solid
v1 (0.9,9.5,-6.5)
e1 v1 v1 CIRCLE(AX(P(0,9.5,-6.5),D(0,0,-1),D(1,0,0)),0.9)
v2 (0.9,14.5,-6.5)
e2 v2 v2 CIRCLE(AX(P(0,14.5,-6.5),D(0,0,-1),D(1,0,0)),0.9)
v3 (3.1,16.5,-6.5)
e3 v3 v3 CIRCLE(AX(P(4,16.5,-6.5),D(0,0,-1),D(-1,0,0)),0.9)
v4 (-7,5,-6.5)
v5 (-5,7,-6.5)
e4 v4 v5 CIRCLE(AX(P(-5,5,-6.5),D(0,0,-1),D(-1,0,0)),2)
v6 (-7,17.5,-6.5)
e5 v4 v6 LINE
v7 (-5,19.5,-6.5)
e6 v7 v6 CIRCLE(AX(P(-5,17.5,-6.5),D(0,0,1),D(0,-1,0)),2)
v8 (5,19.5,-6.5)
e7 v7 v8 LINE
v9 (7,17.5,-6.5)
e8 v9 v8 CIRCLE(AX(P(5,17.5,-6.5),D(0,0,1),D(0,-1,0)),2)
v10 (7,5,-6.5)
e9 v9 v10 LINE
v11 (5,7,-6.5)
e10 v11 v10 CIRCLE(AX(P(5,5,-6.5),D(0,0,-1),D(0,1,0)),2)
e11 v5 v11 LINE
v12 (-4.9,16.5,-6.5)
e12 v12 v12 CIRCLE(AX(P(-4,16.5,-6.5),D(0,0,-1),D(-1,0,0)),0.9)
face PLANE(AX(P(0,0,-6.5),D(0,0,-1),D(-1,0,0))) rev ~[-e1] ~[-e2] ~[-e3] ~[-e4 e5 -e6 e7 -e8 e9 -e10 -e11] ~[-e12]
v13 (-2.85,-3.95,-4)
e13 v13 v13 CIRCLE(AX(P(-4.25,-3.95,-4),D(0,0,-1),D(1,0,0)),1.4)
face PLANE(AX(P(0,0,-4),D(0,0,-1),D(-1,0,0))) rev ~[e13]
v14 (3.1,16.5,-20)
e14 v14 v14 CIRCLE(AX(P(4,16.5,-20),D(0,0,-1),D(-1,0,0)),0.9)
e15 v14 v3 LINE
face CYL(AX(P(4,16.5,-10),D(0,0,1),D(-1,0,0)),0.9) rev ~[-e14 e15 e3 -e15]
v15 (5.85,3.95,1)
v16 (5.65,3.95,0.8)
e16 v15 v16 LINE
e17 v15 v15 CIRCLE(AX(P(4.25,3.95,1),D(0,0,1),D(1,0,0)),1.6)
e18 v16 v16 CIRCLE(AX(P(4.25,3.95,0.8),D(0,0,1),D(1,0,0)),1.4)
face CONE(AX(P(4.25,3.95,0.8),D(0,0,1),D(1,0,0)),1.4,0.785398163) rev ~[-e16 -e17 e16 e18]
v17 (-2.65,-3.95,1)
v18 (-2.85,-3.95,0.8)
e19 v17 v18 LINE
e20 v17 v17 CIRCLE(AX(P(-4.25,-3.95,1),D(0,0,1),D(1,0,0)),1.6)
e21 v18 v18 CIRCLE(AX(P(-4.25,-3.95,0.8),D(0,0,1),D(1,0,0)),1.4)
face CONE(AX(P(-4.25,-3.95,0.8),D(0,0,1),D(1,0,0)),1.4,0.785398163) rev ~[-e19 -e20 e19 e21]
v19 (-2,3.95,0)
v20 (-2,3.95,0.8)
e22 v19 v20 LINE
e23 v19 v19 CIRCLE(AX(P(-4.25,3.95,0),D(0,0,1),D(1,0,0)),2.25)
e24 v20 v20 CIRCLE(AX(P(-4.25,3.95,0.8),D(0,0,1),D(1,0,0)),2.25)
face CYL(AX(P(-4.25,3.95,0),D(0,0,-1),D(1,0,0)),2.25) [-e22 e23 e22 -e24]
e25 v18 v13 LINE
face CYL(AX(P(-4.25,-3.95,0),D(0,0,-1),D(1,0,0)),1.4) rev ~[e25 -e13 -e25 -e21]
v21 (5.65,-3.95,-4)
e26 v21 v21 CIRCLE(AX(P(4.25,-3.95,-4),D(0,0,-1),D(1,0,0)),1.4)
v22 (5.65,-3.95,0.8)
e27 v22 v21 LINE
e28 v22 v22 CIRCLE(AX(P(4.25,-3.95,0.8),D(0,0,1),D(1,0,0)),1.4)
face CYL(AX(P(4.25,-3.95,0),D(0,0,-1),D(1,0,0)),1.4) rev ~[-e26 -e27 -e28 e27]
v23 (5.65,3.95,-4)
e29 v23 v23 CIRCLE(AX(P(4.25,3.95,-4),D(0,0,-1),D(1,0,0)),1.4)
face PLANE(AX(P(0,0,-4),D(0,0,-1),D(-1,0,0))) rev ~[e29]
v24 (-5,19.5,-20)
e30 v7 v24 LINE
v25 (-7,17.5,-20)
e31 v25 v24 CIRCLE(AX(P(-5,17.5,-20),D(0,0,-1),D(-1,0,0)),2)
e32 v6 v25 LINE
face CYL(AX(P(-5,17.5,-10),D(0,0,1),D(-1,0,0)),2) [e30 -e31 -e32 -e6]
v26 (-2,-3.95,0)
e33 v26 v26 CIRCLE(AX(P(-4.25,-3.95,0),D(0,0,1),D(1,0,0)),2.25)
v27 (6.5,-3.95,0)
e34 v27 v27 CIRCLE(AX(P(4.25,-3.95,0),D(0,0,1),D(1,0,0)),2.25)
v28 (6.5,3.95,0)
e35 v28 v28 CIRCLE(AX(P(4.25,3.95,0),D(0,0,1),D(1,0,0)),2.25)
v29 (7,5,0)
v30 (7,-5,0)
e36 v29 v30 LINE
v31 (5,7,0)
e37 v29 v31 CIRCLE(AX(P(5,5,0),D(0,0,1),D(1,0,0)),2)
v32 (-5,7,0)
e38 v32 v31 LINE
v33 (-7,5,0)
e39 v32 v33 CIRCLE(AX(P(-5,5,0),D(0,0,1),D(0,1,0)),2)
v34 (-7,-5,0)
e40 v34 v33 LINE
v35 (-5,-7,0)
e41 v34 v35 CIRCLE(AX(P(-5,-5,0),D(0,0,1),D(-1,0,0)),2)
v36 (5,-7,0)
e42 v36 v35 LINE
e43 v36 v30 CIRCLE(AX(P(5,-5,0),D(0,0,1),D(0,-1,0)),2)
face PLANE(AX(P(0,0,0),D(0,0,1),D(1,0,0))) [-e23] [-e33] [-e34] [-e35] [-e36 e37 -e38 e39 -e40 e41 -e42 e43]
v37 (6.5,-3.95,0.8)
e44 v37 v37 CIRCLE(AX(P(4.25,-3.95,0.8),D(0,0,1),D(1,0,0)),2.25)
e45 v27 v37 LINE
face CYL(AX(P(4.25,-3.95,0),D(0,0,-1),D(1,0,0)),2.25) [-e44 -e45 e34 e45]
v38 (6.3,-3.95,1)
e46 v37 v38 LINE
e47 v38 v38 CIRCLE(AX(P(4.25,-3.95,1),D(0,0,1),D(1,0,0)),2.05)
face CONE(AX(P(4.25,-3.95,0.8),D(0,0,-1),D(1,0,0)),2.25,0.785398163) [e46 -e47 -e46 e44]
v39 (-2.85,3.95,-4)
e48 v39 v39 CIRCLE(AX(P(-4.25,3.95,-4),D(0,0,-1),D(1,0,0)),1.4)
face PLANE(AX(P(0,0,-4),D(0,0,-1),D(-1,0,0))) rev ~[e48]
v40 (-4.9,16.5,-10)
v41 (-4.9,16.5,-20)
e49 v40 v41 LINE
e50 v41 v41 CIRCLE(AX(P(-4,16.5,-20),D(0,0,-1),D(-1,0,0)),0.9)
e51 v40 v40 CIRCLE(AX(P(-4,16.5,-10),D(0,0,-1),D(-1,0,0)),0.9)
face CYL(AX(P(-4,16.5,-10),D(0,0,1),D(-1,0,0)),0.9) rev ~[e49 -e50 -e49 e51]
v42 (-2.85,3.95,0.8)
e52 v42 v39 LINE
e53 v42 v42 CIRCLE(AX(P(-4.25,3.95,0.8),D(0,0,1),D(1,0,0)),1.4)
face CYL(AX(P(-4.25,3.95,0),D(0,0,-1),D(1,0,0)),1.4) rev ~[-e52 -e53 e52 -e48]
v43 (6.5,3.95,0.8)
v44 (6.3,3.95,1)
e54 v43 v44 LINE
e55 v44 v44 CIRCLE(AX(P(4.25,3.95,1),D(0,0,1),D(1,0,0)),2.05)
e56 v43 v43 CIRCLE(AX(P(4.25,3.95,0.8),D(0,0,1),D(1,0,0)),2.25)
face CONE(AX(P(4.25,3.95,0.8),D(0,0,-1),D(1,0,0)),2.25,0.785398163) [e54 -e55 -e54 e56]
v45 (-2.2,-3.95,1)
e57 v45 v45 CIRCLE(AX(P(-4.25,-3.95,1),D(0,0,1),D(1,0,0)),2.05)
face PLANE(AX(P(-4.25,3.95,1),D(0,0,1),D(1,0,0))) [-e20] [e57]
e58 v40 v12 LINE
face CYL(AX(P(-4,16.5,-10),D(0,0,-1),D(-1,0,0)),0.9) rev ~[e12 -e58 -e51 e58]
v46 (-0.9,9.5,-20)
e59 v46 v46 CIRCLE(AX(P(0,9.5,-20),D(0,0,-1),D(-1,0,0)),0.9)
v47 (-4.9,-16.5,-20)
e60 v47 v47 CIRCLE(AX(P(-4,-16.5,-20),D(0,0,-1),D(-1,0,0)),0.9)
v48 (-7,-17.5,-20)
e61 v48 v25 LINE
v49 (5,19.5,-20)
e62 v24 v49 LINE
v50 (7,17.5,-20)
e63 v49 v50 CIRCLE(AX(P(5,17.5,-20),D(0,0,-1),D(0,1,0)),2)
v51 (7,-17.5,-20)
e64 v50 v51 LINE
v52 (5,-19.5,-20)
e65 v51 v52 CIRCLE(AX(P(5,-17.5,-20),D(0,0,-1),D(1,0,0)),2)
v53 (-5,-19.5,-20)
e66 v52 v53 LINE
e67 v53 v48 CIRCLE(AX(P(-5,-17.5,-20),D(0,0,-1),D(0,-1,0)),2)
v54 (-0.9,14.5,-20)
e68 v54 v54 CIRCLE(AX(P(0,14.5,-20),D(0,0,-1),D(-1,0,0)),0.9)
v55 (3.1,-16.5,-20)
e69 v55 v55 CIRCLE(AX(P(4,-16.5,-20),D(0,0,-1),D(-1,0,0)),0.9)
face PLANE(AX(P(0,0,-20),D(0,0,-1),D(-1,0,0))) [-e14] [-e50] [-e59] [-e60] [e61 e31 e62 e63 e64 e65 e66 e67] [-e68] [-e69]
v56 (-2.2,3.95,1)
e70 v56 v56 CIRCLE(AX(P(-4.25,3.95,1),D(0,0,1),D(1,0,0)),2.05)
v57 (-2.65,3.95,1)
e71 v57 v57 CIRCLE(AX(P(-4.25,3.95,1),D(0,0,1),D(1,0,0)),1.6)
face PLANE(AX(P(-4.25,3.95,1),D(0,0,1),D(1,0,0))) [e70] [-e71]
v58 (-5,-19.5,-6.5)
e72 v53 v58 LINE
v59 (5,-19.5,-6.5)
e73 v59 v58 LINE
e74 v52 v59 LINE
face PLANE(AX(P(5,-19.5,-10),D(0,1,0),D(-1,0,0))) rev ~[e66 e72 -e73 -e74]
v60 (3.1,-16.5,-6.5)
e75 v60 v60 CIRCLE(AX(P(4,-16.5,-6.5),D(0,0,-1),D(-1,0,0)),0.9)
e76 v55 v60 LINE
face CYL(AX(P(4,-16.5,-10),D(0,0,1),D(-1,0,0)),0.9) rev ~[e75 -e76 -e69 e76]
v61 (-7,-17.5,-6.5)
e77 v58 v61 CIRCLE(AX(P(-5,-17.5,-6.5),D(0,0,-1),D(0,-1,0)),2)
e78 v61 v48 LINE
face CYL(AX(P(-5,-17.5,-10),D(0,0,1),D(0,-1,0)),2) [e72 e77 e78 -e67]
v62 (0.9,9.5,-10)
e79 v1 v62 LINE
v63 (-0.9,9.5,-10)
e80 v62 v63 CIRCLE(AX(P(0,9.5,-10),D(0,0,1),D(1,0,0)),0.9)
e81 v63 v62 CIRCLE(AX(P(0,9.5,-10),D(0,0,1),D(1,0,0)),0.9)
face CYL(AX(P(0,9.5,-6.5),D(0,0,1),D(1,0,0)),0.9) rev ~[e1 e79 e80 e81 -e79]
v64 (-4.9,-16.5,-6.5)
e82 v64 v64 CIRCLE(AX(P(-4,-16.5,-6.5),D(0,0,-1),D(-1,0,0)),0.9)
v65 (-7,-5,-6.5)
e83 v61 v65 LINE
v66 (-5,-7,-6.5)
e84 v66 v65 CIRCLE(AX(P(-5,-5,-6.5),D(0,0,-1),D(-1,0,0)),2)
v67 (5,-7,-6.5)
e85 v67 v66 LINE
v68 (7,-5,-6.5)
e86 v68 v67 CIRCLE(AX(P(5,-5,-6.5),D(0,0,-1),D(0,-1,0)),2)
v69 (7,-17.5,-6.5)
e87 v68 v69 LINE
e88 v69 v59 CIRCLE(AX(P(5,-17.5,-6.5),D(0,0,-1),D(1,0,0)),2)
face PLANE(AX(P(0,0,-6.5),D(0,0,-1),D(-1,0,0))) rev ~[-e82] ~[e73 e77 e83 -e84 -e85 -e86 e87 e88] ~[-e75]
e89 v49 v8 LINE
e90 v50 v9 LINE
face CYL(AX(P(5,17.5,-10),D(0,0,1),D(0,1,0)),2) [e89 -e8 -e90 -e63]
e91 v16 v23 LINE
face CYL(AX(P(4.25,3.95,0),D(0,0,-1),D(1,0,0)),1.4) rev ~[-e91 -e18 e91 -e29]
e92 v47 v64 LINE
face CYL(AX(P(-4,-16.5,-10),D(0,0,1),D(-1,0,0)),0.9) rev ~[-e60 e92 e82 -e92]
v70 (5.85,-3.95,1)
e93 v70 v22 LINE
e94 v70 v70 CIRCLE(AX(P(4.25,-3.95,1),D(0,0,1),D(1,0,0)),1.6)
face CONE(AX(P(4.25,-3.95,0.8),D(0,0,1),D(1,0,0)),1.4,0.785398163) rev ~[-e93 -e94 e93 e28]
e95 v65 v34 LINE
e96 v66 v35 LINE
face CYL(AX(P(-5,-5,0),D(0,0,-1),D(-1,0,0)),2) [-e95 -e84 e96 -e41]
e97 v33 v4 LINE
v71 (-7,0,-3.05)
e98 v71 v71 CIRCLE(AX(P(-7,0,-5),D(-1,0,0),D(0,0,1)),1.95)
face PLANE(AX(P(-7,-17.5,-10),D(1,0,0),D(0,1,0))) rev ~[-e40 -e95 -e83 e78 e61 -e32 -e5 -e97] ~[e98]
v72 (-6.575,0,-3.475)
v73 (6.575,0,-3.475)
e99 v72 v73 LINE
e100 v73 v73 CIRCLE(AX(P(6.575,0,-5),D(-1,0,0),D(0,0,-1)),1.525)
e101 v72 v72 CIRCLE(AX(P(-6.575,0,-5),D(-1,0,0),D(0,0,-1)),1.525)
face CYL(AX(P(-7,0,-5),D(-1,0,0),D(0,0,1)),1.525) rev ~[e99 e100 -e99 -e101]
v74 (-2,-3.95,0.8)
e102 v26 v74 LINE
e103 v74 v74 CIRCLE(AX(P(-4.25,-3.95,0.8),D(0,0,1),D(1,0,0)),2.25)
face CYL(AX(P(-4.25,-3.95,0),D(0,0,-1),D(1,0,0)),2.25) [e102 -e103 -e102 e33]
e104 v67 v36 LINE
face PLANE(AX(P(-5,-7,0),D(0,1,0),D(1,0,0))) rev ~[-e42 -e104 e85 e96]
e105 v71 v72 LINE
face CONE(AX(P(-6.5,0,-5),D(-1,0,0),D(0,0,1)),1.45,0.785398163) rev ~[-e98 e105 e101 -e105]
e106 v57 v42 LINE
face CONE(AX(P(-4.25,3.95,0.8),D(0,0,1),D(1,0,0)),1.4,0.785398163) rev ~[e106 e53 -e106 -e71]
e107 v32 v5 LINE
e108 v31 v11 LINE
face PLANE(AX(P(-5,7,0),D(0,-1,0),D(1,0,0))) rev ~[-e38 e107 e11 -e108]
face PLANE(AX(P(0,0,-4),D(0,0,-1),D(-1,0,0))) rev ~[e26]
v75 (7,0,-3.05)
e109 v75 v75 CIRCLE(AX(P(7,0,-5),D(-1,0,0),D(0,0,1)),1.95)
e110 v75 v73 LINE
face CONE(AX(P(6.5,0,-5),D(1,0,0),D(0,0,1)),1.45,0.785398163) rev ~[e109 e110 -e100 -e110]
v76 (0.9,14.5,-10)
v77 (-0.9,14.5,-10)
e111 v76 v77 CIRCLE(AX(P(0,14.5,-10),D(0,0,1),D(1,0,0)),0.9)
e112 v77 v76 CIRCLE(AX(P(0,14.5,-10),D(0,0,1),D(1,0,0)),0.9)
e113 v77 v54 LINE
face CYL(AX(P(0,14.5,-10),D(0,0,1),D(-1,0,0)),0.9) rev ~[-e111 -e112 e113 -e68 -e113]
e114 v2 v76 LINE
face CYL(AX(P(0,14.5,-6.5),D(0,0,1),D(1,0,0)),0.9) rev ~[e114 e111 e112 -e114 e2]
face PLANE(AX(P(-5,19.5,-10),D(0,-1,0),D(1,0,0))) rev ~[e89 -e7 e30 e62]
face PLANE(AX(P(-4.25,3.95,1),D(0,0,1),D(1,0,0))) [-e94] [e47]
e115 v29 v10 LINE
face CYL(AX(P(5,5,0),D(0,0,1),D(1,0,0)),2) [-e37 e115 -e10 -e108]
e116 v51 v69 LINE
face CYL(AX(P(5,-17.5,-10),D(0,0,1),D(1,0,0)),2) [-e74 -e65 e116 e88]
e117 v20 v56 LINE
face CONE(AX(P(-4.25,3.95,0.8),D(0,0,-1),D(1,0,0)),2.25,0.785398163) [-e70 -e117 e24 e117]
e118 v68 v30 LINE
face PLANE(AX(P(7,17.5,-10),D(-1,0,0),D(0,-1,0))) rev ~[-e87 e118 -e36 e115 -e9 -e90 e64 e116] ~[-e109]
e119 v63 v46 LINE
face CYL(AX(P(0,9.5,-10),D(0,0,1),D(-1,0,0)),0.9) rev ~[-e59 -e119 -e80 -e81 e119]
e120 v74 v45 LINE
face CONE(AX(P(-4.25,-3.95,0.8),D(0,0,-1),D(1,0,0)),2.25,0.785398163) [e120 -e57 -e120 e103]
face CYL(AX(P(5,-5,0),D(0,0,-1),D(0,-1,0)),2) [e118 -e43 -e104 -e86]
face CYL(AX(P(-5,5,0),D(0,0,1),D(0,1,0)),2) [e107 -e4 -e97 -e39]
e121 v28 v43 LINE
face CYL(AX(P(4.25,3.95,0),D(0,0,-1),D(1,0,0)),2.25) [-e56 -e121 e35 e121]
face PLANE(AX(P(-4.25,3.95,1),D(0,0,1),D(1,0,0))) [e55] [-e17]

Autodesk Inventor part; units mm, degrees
ref_plane "YZ Plane" through (0, 0, 0) normal (1, 0, 0) x (0, 1, 0)
ref_plane "XZ Plane" through (0, 0, 0) normal (0, 1, 0) x (-1, 0, 0)
ref_plane "XY Plane" through (0, 0, 0) normal (0, 0, 1) x (1, 0, 0)
sketch "Sketch1" plane through (0, 0, 0) normal (0, 0, 1) x (1, 0, 0)
  circle A0 centre (4.25, 3.95) radius 1.4
  circle A1 centre (-4.25, 3.95) radius 1.4
  circle A2 centre (-4.25, -3.95) radius 1.4
  circle A3 centre (4.25, -3.95) radius 1.4
  line L0 (-5, 7) -> (5, 7)
  line L1 (7, 5) -> (7, -5)
  line L2 (5, -7) -> (-5, -7)
  line L3 (-7, -5) -> (-7, 5)
  arc A4 (-5, 7) -> (-7, 5) centre (-5, 5) ccw
  arc A5 (7, 5) -> (5, 7) centre (5, 5) ccw
  arc A6 (5, -7) -> (7, -5) centre (5, -5) ccw
  arc A7 (-7, -5) -> (-5, -7) centre (-5, -5) ccw
  circle A8 centre (-4.25, 3.95) radius 2.25
  circle A9 centre (4.25, 3.95) radius 2.25
  circle A10 centre (4.25, -3.95) radius 2.25
  circle A11 centre (-4.25, -3.95) radius 2.25
  point P0 (0, 0)
extrude "Extrusion1" add sketch "Sketch1" along normal blind 1 contours A8 | A9 | A10 | A11
extrude "Extrusion2" add sketch "Sketch1" against normal blind 10 contours L0 A5 L1 A6 L2 A7 L3 A4 | A8 | A9 | A10 | A11
sketch "Sketch2" plane through (-7, -5, 0) normal (-1, 0, 0) x (0, 0, 1)
  circle A0 centre (-5, 5) radius 1.45
  point P0 (0, 5)
extrude "Extrusion3" cut sketch "Sketch2" against normal blind 20
chamfer "Chamfer1" distance 0.5 angle 45 2 edges at (-7, 0, -6.45) (7, 0, -6.45)
sketch "Sketch3" plane through (0, 0, -10) normal (0, 0, -1) x (-1, 0, 0)
  circle A0 centre (4.25, -3.95) radius 1.4 projected
  circle A1 centre (-4.25, -3.95) radius 1.4 projected
  circle A2 centre (-4.25, 3.95) radius 1.4 projected
  circle A3 centre (4.25, 3.95) radius 1.4 projected
  point P0 (0, 0)
extrude "Extrusion4" add sketch "Sketch3" against normal blind 6
chamfer "Chamfer2" distance 0.2 angle 45 8 edges at (2.85, -3.95, 1) (-5.65, -3.95, 1) (2.85, 3.95, 1) (-5.65, 3.95, 1) (2, -3.95, 1) (-6.5, -3.95, 1) (-6.5, 3.95, 1) (2, 3.95, 1)
sketch "Sketch4" plane through (-4.25, 3.95, 1) normal (0, 0, 1) x (1, 0, 0)
  circle A0 centre (0, 0) radius 3.95
  circle A1 centre (0, -7.9) radius 3.95
  circle A2 centre (8.5, -7.9) radius 3.95
  circle A3 centre (8.5, 0) radius 3.95
  point P0 (4.25, -3.95)
  point P1 (8.5, -3.95)
  point P2 (0, -3.95)
extrude "Extrusion5" add sketch "Sketch4" along normal blind 4
sketch "Sketch5" plane through (-7, -5, 0) normal (-1, 0, 0) x (0, 0, 1)
  line L0 (-0.5, -2.9) -> (6.5, -2.9)
  line L1 (6.5, -2.9) -> (6.5, 12.9)
  line L2 (6.5, 12.9) -> (-0.5, 12.9)
  line L3 (-0.5, 14.9) -> (8.5, 14.9)
  line L4 (8.5, 14.9) -> (8.5, -4.9)
  line L5 (8.5, -4.9) -> (-0.5, -4.9)
  line L6 (-0.5, 12.9) -> (-0.5, 14.9)
  line L7 (-0.5, -4.9) -> (-0.5, -2.9)
  circle A0 centre (-5, 5) radius 1.45 projected
  circle A1 centre (-5, 5) radius 1.45
sketch "Sketch6" plane through (0, 0, -10) normal (0, 0, -1) x (-1, 0, 0)
  line L0 (7, -1.95) -> (7, 1.95) projected
  line L1 (7, 0) -> (-7, 0)
  line L2 (-7, 0) -> (-7, -17)
  line L3 (-7, -17) -> (7, -17)
  line L4 (7, -17) -> (7, 0)
  line L5 (-5, -7) -> (5, -7) projected
  arc A0 (-7, -5) -> (-5, -7) centre (-5, -5) ccw projected
  arc A1 (5, -7) -> (7, -5) centre (5, -5) ccw projected
  point P0 (0, 0)
  dimension "d37" = 17
extrude "Extrusion6" add sketch "Sketch6" against normal blind 8 contours L4 L3 L2 A0 L5 A1
sketch "Sketch7" plane through (0, 0, -2) normal (0, 0, 1) x (1, 0, 0)
  line L0 (-5, -7) -> (5, -7) projected
  line L1 (0, -7) -> (0, -11)
  line L2 (7, 5) -> (7, -17) projected
  line L3 (-7, -17) -> (-7, 5) projected
  line L4 (7, -11) -> (-7, -11)
  line L5 (-7, -11) -> (-7, -17)
  line L6 (-7, -17) -> (7, -17)
  line L7 (7, -17) -> (7, -11)
  point P0 (0, 0)
extrude "Extrusion7" add sketch "Sketch7" along normal blind 12
sketch "Sketch8" plane through (0, 0, -10) normal (0, 0, -1) x (-1, 0, 0)
  arc A0 (-5, 7) -> (-7, 5) centre (-5, 5) ccw projected
  line L0 (7, 5) -> (7, 19.5)
  line L1 (7, 19.5) -> (-7, 19.5)
  line L2 (-7, 19.5) -> (-7, 5)
  arc A1 (7, 5) -> (5, 7) centre (5, 5) ccw projected
  line L3 (5, 7) -> (-5, 7) projected
  point P0 (0, 0)
extrude "Extrusion8" add sketch "Sketch8" against normal blind 3.5
sketch "Sketch9" plane through (0, 0, 10) normal (0, 0, 1) x (1, 0, 0)
  line L0 (7, -11) -> (-7, -11) projected
  line L1 (7, 19.5) -> (7, -17) projected
  line L2 (-7, -11) -> (7, -11)
  line L3 (7, -11) -> (7, -11.4)
  line L4 (7, -11.4) -> (-7, -11.4)
  line L5 (-7, -11.4) -> (-7, -11)
  point P0 (0, 0)
  dimension "d47" = 0.4
extrude "Extrusion9" cut sketch "Sketch9" against normal up to surface (12 mm away)
sketch "Sketch10" plane through (0, 0, -6.5) normal (0, 0, 1) x (1, 0, 0)
  line L0 (-7, 19.5) -> (7, 19.5) projected
  line L1 (0, 19.5) -> (0, 9.5)
  circle A0 centre (0, 9.5) radius 0.9
  circle A1 centre (0, 14.5) radius 0.9
  point P0 (0, 0)
  dimension "d50" = 10
  dimension "d51" = 1.8
  dimension "d52" = 1.8
extrude "Extrusion10" cut sketch "Sketch10" against normal blind 10
fillet "Fillet1" radius 2 2 edges at (-7, 19.5, -8.25) (7, 19.5, -8.25)
sketch "Sketch12" plane through (0, 0, -10) normal (0, 0, -1) x (-1, 0, 0)
  line L0 (7, -17) -> (-7, -17) projected
  line L1 (7, -17) -> (2, -17)
  line L2 (-7, -17) -> (-2, -17)
  circle A0 centre (4.5, -20) radius 1
  circle A1 centre (4.5, -20) radius 2.5
  circle A2 centre (-4.5, -20) radius 1
  circle A3 centre (-4.5, -20) radius 2.5
  line L3 (7, -17) -> (7, -20)
  line L4 (-7, -17) -> (-7, -20)
  line L5 (-4.5, -22.5) -> (4.5, -22.5)
  point P0 (0, 0)
  dimension "d57" = 5
extrude "Extrusion11" add sketch "Sketch12" against normal blind 3
sketch "Sketch13" plane through (0, 0, 10) normal (0, 0, 1) x (1, 0, 0)
  line L0 (7, -20) -> (7, -17) projected
  line L1 (-7, -17) -> (7, -17) projected
  line L2 (-7, -17) -> (-7, -20) projected
  arc A0 (-7, -20) -> (-4.5, -22.5) centre (-4.5, -20) ccw projected
  line L3 (-4.5, -22.5) -> (4.5, -22.5) projected
  arc A1 (4.5, -22.5) -> (7, -20) centre (4.5, -20) ccw projected
  circle A2 centre (-4.5, -20) radius 1 projected
  circle A3 centre (4.5, -20) radius 1 projected
  line L4 (7, -11.4) -> (-7, -11.4) projected
  line L5 (-7, -11.4) -> (-7, -17) projected
  line L6 (-7, -17) -> (7, -17) projected
  line L7 (7, -17) -> (7, -11.4) projected
  circle A4 centre (4.5, -14.2) radius 0.9
  circle A5 centre (-4.5, -14.2) radius 0.9
  point P0 (0, 0)
extrude "Extrusion12" cut sketch "Sketch13" against normal blind 3 contours L1 L5 L4 L7 | A4 | A5
extrude "Extrusion13" cut sketch "Sketch13" against normal blind 12 contours A4 | A5
fillet "Fillet2" radius 1 1 edges at (0, -11.4, -2)
sketch "Sketch14" plane through (0, 0, -10) normal (0, 0, -1) x (-1, 0, 0)
  circle A0 centre (-4.5, -20) radius 1 projected
  circle A1 centre (4.5, -20) radius 1 projected
  circle A2 centre (0, -27.2111) radius 6.5
  point P0 (0, 0)
extrude "Extrusion14" cut sketch "Sketch14" against normal blind 12 contours A2
fillet "Fillet3" radius 1 2 edges at (-4.4783, -22.5, -8.5) (4.4783, -22.5, -8.5)
sketch "Sketch16" plane through (0, 0, -10) normal (0, 0, -1) x (-1, 0, 0)
  line L0 (-7, -17) -> (7, -17) projected
  line L1 (-7, -17) -> (-1, -17)
  line L2 (-1, -17) -> (-1, -11)
  line L3 (-1, -11) -> (-7, -11)
  line L4 (-7, -11) -> (-7, -17)
  line L5 (-5, 19.5) -> (-0.9, 19.5)
  line L6 (-0.9, 19.5) -> (-0.9, 13)
  line L7 (-0.9, 13) -> (-7, 13)
  line L8 (-7, 13) -> (-7, 17.5)
  line L9 (-7, 17.5) -> (-7, -20) projected
  line L10 (-0.9, 13) -> (-7, 13)
  line L11 (-7, 13) -> (-7, 15)
  line L12 (-7, 15) -> (-0.9, 15)
  line L13 (-0.9, 15) -> (-0.9, 13)
  line L14 (-7, -11) -> (-1, -11)
  line L15 (-1, -11) -> (-1, -13)
  line L16 (-1, -13) -> (-7, -13)
  line L17 (-7, -13) -> (-7, -11)
  circle A0 centre (-3.95, 17.25) radius 0.9
  circle A1 centre (-4, -15) radius 0.9
  arc A2 (-5, 19.5) -> (-7, 17.5) centre (-5, 17.5) ccw projected
  point P0 (0, 0)
  dimension "d83" = 2
extrude "Extrusion15" cut sketch "Sketch16" against normal blind 6 contours A0 | A1
chamfer "Chamfer3" distance 0.4 angle 45 6 edges at (4.9, -15, -10) (4.85, 17.25, -10) (5.5, -20, -10) (-3.5, -20, -10) (5.5, -20, -7) (-3.5, -20, -7)
sketch "Sketch17" plane through (-4.25, 3.95, 5) normal (0, 0, 1) x (1, 0, 0)
  circle A0 centre (0, 0) radius 3.95 projected
  circle A1 centre (8.5, 0) radius 3.95 projected
  circle A2 centre (8.5, -7.9) radius 3.95 projected
  circle A3 centre (0, -7.9) radius 3.95 projected
  point P0 (4.25, -3.95)
  point P1 (0, -3.95)
  point P2 (8.5, -3.95)
  point P3 (8.5, -3.95)
  point P4 (0, -3.95)
  point P5 (8.5, -3.95)
  point P6 (0, -3.95)
extrude "Extrusion16" cut sketch "Sketch17" against normal blind 4
sketch "Sketch18" plane through (0, 0, 0) normal (0, 0, 1) x (1, 0, 0)
  line L0 (7, -10.4) -> (-7, -10.4) projected
  line L1 (7, -10.4) -> (7, -5) projected
  arc A0 (5, -7) -> (7, -5) centre (5, -5) ccw projected
  line L2 (-5, -7) -> (5, -7) projected
  arc A1 (-7, -5) -> (-5, -7) centre (-5, -5) ccw projected
  line L3 (-7, -5) -> (-7, -10.4) projected
  line L4 (-7, -10.4) -> (-7, -11.4) projected
  line L5 (-7, -11.4) -> (7, -11.4) projected
  line L6 (7, -11.4) -> (7, -10.4) projected
  line L7 (7, -10.4) -> (-7, -10.4) projected
  circle A2 centre (-4.5, -14.2) radius 0.9 projected
  circle A3 centre (4.5, -14.2) radius 0.9 projected
  line L8 (7, -17) -> (-7, -17) projected
  line L9 (7, -11.4) -> (7, -17) projected
  line L10 (-7, -11.4) -> (7, -11.4) projected
  line L11 (-7, -17) -> (-7, -11.4) projected
  circle A4 centre (4.5, -20) radius 1.4 projected
  arc A5 (4.1777, -22.2315) -> (5.0341, -22.4423) centre (4.8204, -21.4654) ccw projected
  arc A6 (5.0341, -22.4423) -> (7, -20) centre (4.5, -20) ccw projected
  line L12 (7, -20) -> (7, -17) projected
  line L13 (-7, -17) -> (7, -17) projected
  line L14 (-7, -17) -> (-7, -20) projected
  arc A7 (-7, -20) -> (-5.0341, -22.4423) centre (-4.5, -20) ccw projected
  arc A8 (-5.0341, -22.4423) -> (-4.1777, -22.2315) centre (-4.8204, -21.4654) ccw projected
  arc A9 (4.1777, -22.2315) -> (-4.1777, -22.2315) centre (0, -27.2111) ccw projected
  circle A10 centre (-4.5, -20) radius 1.4 projected
  line L15 (-7, -17) -> (-7, -11.4) projected
  line L16 (7, -11.4) -> (7, -17) projected
  point P0 (0, 0)
extrude "Extrusion17" cut sketch "Sketch18" along normal mid plane 30 contours L6 L5 L4 L0 | L0 L3 A1 L2 A0 L1 | L9 L8 L11 L5 | L12 A6 A5 A9 A8 A7 L14 L8 | A2 | A3 | A4 | A10
sketch "Sketch19" plane through (0, 0, -10) normal (0, 0, -1) x (-1, 0, 0)
  arc A0 (5, -7) -> (7, -5) centre (5, -5) ccw projected
  line L0 (7, -5) -> (-7, -5)
  line L1 (-7, -5) -> (-7, -17.5)
  line L2 (-5, -19.5) -> (5, -19.5)
  line L3 (7, -17.5) -> (7, -5)
  arc A1 (5, -19.5) -> (7, -17.5) centre (5, -17.5) ccw
  arc A2 (-7, -17.5) -> (-5, -19.5) centre (-5, -17.5) ccw
  point P0 (0, 0)
  dimension "d98" = 2
extrude "Extrusion18" add sketch "Sketch19" against normal up to surface (3.5 mm away)
sketch "Sketch20" plane through (0, 0, -10) normal (0, 0, -1) x (-1, 0, 0)
  circle A0 centre (-3.95, 17.25) radius 1.3 projected
  circle A1 centre (-3.95, 17.25) radius 1.3
  point P0 (0, 0)
extrude "Extrusion19" add sketch "Sketch20" against normal blind 3.5
sketch "Sketch21" plane through (0, 0, -10) normal (0, 0, -1) x (-1, 0, 0)
  arc A0 (-5, 19.5) -> (-7, 17.5) centre (-5, 17.5) ccw projected
  arc A1 (5, -19.5) -> (7, -17.5) centre (5, -17.5) ccw projected
  circle A2 centre (-4, -16.5) radius 0.9
  circle A3 centre (4, -16.5) radius 0.9
  circle A4 centre (4, 16.5) radius 0.9
  circle A5 centre (-4, 16.5) radius 0.9
extrude "Extrusion20" cut sketch "Sketch21" against normal blind 3.5
sketch "Sketch22" plane through (-7, -5, 0) normal (-1, 0, 0) x (0, 0, 1)
  circle A0 centre (-5, 5) radius 1.45 projected
  circle A1 centre (-5, 5) radius 1.525
  point P0 (0, 5)
  dimension "d110" = 3.05
extrude "Extrusion21" cut sketch "Sketch22" against normal blind 20
sketch "Sketch23" plane through (0, 0, -10) normal (0, 0, -1) x (-1, 0, 0)
  circle A0 centre (-4, -16.5) radius 0.9 projected
  circle A1 centre (4, 16.5) radius 0.9 projected
  circle A2 centre (4, -16.5) radius 0.9 projected
  circle A3 centre (-4, 16.5) radius 0.9 projected
  line L0 (7, -17.5) -> (7, 17.5) projected
  arc A4 (7, 17.5) -> (5, 19.5) centre (5, 17.5) ccw projected
  line L1 (5, 19.5) -> (-5, 19.5) projected
  arc A5 (-5, 19.5) -> (-7, 17.5) centre (-5, 17.5) ccw projected
  line L2 (-7, 17.5) -> (-7, -17.5) projected
  arc A6 (-7, -17.5) -> (-5, -19.5) centre (-5, -17.5) ccw projected
  line L3 (-5, -19.5) -> (5, -19.5) projected
  arc A7 (5, -19.5) -> (7, -17.5) centre (5, -17.5) ccw projected
  circle A8 centre (0, 14.5) radius 0.9 projected
  circle A9 centre (0, 9.5) radius 0.9 projected
  point P0 (0, 0)
extrude "Extrusion22" add sketch "Sketch23" along normal blind 10
properties part number "slider" material "Steel"
